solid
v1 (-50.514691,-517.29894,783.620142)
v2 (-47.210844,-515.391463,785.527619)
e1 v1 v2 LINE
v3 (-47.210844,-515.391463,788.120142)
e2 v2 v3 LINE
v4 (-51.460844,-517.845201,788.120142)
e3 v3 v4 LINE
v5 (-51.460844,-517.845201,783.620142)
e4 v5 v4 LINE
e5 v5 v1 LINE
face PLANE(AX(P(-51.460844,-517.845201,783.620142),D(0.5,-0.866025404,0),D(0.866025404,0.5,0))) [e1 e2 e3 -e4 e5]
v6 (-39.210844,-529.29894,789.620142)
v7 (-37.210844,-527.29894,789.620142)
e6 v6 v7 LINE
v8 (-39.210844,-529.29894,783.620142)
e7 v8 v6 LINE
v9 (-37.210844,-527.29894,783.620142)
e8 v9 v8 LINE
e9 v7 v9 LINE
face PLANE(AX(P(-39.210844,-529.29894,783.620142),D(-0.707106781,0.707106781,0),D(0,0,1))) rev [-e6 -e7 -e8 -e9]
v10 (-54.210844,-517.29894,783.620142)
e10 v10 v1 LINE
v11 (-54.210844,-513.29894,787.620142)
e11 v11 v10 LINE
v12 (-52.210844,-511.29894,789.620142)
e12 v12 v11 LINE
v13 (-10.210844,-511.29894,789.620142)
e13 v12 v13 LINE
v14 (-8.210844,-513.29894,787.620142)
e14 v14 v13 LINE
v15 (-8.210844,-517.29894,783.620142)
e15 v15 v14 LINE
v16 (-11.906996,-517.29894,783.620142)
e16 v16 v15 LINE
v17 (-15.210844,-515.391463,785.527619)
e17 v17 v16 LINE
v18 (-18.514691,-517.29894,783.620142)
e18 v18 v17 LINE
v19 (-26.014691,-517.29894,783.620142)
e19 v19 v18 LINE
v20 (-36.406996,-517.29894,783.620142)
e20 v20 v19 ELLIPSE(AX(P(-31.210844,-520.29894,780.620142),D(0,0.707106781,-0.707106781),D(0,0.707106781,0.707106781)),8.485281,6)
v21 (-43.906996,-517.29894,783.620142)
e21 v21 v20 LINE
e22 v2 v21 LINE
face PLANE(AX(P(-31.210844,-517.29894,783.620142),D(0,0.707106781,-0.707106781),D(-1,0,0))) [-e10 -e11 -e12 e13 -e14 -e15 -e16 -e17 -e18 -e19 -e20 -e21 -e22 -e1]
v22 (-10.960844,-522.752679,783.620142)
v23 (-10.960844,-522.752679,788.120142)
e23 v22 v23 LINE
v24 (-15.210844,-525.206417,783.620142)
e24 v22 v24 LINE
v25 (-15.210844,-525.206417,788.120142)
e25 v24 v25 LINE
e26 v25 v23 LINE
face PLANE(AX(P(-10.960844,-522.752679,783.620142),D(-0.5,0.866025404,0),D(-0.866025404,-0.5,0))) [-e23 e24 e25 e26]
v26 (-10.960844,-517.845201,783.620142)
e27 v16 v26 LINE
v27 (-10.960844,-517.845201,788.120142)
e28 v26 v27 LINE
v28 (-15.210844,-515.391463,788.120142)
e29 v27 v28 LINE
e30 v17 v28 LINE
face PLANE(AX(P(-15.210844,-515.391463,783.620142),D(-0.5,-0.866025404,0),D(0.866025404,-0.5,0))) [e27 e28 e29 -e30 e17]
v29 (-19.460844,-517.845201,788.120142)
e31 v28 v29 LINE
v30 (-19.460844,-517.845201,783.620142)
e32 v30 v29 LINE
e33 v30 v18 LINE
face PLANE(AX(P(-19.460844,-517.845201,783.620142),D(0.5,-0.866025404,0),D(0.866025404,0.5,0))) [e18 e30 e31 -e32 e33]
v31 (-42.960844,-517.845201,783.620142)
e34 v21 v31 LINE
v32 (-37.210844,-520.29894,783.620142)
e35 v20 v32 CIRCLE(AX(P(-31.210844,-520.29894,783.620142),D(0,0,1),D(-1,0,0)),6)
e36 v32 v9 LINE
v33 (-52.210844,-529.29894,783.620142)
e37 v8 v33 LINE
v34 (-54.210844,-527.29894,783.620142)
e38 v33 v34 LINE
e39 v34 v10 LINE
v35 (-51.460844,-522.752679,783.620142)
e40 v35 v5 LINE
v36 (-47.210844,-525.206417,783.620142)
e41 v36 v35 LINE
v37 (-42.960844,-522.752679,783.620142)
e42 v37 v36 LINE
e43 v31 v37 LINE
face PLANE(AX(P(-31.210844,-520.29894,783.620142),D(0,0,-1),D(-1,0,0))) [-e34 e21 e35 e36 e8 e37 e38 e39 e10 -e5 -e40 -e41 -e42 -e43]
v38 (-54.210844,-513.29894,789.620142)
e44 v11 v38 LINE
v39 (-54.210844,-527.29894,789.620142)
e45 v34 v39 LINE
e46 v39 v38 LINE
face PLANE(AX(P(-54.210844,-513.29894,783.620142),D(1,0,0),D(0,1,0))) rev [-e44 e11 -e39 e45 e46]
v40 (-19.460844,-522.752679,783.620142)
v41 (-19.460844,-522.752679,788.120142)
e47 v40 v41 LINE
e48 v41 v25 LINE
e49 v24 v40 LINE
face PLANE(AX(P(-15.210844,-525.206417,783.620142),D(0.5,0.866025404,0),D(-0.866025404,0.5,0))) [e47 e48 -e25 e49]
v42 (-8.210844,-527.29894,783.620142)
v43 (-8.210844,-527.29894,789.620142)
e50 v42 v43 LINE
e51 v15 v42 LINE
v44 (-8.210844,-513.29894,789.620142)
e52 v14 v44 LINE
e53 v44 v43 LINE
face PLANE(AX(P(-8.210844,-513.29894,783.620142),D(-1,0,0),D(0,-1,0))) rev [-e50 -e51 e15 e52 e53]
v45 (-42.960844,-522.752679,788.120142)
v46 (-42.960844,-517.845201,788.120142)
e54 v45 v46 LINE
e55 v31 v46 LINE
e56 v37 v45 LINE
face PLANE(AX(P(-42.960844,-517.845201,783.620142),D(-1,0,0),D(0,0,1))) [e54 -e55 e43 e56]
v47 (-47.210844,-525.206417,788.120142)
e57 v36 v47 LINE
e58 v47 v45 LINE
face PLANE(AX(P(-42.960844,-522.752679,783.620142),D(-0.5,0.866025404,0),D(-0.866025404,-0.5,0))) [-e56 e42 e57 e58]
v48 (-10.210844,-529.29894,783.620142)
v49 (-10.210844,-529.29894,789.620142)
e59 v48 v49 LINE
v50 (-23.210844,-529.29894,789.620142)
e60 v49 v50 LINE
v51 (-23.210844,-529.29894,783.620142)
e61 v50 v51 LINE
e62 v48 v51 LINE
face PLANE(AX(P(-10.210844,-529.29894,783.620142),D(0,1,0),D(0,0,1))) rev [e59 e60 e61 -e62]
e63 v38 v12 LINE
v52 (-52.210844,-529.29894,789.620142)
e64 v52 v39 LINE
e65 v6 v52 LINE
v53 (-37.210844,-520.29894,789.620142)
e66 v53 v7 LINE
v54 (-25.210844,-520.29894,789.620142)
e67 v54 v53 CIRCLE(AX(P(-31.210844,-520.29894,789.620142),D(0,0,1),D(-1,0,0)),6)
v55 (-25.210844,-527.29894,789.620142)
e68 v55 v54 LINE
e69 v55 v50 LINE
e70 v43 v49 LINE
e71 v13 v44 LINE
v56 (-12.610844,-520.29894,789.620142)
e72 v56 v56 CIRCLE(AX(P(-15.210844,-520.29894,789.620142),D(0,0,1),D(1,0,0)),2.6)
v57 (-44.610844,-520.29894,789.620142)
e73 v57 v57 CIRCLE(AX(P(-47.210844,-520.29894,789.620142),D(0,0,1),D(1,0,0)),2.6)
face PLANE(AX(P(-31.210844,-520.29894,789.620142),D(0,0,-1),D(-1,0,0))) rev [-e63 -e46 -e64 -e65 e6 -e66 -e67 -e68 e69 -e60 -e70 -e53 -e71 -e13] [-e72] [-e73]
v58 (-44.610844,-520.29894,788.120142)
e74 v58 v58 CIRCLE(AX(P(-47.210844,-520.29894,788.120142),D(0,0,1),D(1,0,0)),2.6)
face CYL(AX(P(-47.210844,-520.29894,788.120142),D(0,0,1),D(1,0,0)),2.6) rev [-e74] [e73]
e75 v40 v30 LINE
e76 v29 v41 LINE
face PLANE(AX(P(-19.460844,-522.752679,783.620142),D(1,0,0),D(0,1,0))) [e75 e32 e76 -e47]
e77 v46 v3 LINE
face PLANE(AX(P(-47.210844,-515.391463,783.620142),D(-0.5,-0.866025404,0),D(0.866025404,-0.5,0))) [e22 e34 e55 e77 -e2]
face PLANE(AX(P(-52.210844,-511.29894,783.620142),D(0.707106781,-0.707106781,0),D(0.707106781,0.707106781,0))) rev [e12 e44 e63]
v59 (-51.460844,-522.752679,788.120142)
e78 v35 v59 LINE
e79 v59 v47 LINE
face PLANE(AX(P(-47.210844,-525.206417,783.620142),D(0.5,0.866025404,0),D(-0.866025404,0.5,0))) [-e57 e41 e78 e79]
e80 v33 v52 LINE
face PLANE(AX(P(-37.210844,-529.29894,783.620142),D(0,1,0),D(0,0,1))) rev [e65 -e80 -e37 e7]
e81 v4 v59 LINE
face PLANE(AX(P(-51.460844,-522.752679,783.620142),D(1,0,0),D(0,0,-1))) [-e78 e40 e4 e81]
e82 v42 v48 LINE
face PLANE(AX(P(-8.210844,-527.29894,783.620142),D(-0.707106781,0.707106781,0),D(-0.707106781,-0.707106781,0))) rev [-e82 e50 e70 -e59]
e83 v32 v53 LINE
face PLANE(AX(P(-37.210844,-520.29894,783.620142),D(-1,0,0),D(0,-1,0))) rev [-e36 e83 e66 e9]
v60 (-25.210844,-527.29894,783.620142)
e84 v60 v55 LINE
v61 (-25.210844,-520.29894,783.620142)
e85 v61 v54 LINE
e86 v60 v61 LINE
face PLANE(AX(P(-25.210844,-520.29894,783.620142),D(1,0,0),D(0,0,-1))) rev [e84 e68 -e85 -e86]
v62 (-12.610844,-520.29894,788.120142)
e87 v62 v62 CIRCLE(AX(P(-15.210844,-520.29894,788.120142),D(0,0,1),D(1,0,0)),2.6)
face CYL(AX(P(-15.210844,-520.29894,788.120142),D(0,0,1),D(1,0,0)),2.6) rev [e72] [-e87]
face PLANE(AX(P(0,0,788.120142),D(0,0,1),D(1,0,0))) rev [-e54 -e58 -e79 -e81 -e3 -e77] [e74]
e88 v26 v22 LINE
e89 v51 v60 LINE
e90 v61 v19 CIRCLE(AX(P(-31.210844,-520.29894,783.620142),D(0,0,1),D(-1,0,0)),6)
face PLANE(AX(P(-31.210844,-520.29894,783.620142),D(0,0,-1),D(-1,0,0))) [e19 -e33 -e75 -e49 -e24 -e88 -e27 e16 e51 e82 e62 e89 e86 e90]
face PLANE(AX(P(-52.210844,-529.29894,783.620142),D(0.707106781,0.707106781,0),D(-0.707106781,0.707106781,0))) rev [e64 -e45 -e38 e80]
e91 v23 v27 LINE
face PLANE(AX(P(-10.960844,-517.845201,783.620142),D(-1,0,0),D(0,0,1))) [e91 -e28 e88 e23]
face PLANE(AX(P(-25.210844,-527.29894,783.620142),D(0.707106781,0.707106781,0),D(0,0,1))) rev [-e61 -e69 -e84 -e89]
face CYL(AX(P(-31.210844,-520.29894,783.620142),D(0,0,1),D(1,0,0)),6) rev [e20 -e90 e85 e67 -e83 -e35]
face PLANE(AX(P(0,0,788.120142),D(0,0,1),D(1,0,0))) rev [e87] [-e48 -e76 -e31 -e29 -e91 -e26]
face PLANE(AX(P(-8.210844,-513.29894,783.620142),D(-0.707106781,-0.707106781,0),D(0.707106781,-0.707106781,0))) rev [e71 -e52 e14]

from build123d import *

# Parameters (mm, degrees)
BOSS_EXTRUDE1_DEPTH = 6
SKETCH2_R           = 2.6
BOSS_EXTRUDE2_DEPTH = 1.5
CHAMFER1_SIZE       = 2
CHAMFER2_SIZE       = 6


with BuildPart() as part:
    # Sketch1 → Boss-Extrude1 (new body)
    with BuildSketch(Plane(origin=(0, 0, 789.620141885), x_dir=(-1, 0, 0), z_dir=(0, 0, -1))):
        with BuildLine():
            Line((8.210843614, -513.298939869), (8.210843614, -527.298939869))
            Line((8.210843614, -527.298939869), (10.210843614, -529.298939869))
            Line((10.210843614, -529.298939869), (25.210843614, -529.298939869))
            Line((25.210843614, -529.298939869), (25.210843614, -520.298939869))
            ThreePointArc((25.210843614, -520.298939869), (31.210843614, -514.298939869), (37.210843614, -520.298939869))
            Line((37.210843614, -520.298939869), (37.210843614, -529.298939869))
            Line((37.210843614, -529.298939869), (52.210843614, -529.298939869))
            Line((52.210843614, -529.298939869), (54.210843614, -527.298939869))
            Line((54.210843614, -527.298939869), (54.210843614, -513.298939869))
            Line((54.210843614, -513.298939869), (52.210843614, -511.298939869))
            Line((52.210843614, -511.298939869), (10.210843614, -511.298939869))
            Line((10.210843614, -511.298939869), (8.210843614, -513.298939869))
        make_face()
        Polygon((10.960843614, -517.845201225), (10.960843614, -522.752678513), (15.210843614, -525.206417157), (19.460843614, -522.752678513), (19.460843614, -517.845201225), (15.210843614, -515.391462581), align=None, mode=Mode.SUBTRACT)
        Polygon((47.210843614, -515.391462581), (42.960843614, -517.845201225), (42.960843614, -522.752678513), (47.210843614, -525.206417157), (51.460843614, -522.752678513), (51.460843614, -517.845201225), align=None, mode=Mode.SUBTRACT)
    extrude(amount=BOSS_EXTRUDE1_DEPTH)

    # Sketch2 → Boss-Extrude2 (add)
    # profile 1 of 2: a face of its own
    with BuildSketch(Plane.XY.offset(789.620141885)):
        Polygon((-10.960843614, -517.845201225), (-15.210843614, -515.391462581), (-19.460843614, -517.845201225), (-19.460843614, -522.752678513), (-15.210843614, -525.206417157), (-10.960843614, -522.752678513), align=None)
        with Locations((-15.210843614, -520.298939869)):
            Circle(SKETCH2_R, mode=Mode.SUBTRACT)
    # profile 2 of 2: a face of its own
    with BuildSketch(Plane.XY.offset(789.620141885)):
        Polygon((-47.210843614, -515.391462581), (-51.460843614, -517.845201225), (-51.460843614, -522.752678513), (-47.210843614, -525.206417157), (-42.960843614, -522.752678513), (-42.960843614, -517.845201225), align=None)
        with Locations((-47.210843614, -520.298939869)):
            Circle(SKETCH2_R, mode=Mode.SUBTRACT)
    extrude(amount=-BOSS_EXTRUDE2_DEPTH)

    # Chamfer1
    chamfer1_edges = [part.edges().sort_by_distance(p)[0] for p in [
        (-25.210843614, -529.298939869, 786.620141885),
        (-37.210843614, -529.298939869, 786.620141885),
    ]]
    chamfer(chamfer1_edges, length=CHAMFER1_SIZE)

    # Chamfer2
    # the kernel refuses this chamfer: 6 mm, written as the material it takes off along each edge
    with BuildSketch(Plane(origin=(-67.640941541, -511.298939869, 783.620141885), x_dir=(0, 0.027495876610582292, 0.9996219169112969), z_dir=(1, 0, 0))) as chamfer2_piece_1:
        Polygon((CHAMFER2_SIZE * 0.999621916911, CHAMFER2_SIZE * 0.0274958766106), (-CHAMFER2_SIZE * 0.0274958766106, CHAMFER2_SIZE * 0.999621916911), (0, 0), align=None)
    extrude(amount=72.860195856, mode=Mode.SUBTRACT)


solid = part.part
